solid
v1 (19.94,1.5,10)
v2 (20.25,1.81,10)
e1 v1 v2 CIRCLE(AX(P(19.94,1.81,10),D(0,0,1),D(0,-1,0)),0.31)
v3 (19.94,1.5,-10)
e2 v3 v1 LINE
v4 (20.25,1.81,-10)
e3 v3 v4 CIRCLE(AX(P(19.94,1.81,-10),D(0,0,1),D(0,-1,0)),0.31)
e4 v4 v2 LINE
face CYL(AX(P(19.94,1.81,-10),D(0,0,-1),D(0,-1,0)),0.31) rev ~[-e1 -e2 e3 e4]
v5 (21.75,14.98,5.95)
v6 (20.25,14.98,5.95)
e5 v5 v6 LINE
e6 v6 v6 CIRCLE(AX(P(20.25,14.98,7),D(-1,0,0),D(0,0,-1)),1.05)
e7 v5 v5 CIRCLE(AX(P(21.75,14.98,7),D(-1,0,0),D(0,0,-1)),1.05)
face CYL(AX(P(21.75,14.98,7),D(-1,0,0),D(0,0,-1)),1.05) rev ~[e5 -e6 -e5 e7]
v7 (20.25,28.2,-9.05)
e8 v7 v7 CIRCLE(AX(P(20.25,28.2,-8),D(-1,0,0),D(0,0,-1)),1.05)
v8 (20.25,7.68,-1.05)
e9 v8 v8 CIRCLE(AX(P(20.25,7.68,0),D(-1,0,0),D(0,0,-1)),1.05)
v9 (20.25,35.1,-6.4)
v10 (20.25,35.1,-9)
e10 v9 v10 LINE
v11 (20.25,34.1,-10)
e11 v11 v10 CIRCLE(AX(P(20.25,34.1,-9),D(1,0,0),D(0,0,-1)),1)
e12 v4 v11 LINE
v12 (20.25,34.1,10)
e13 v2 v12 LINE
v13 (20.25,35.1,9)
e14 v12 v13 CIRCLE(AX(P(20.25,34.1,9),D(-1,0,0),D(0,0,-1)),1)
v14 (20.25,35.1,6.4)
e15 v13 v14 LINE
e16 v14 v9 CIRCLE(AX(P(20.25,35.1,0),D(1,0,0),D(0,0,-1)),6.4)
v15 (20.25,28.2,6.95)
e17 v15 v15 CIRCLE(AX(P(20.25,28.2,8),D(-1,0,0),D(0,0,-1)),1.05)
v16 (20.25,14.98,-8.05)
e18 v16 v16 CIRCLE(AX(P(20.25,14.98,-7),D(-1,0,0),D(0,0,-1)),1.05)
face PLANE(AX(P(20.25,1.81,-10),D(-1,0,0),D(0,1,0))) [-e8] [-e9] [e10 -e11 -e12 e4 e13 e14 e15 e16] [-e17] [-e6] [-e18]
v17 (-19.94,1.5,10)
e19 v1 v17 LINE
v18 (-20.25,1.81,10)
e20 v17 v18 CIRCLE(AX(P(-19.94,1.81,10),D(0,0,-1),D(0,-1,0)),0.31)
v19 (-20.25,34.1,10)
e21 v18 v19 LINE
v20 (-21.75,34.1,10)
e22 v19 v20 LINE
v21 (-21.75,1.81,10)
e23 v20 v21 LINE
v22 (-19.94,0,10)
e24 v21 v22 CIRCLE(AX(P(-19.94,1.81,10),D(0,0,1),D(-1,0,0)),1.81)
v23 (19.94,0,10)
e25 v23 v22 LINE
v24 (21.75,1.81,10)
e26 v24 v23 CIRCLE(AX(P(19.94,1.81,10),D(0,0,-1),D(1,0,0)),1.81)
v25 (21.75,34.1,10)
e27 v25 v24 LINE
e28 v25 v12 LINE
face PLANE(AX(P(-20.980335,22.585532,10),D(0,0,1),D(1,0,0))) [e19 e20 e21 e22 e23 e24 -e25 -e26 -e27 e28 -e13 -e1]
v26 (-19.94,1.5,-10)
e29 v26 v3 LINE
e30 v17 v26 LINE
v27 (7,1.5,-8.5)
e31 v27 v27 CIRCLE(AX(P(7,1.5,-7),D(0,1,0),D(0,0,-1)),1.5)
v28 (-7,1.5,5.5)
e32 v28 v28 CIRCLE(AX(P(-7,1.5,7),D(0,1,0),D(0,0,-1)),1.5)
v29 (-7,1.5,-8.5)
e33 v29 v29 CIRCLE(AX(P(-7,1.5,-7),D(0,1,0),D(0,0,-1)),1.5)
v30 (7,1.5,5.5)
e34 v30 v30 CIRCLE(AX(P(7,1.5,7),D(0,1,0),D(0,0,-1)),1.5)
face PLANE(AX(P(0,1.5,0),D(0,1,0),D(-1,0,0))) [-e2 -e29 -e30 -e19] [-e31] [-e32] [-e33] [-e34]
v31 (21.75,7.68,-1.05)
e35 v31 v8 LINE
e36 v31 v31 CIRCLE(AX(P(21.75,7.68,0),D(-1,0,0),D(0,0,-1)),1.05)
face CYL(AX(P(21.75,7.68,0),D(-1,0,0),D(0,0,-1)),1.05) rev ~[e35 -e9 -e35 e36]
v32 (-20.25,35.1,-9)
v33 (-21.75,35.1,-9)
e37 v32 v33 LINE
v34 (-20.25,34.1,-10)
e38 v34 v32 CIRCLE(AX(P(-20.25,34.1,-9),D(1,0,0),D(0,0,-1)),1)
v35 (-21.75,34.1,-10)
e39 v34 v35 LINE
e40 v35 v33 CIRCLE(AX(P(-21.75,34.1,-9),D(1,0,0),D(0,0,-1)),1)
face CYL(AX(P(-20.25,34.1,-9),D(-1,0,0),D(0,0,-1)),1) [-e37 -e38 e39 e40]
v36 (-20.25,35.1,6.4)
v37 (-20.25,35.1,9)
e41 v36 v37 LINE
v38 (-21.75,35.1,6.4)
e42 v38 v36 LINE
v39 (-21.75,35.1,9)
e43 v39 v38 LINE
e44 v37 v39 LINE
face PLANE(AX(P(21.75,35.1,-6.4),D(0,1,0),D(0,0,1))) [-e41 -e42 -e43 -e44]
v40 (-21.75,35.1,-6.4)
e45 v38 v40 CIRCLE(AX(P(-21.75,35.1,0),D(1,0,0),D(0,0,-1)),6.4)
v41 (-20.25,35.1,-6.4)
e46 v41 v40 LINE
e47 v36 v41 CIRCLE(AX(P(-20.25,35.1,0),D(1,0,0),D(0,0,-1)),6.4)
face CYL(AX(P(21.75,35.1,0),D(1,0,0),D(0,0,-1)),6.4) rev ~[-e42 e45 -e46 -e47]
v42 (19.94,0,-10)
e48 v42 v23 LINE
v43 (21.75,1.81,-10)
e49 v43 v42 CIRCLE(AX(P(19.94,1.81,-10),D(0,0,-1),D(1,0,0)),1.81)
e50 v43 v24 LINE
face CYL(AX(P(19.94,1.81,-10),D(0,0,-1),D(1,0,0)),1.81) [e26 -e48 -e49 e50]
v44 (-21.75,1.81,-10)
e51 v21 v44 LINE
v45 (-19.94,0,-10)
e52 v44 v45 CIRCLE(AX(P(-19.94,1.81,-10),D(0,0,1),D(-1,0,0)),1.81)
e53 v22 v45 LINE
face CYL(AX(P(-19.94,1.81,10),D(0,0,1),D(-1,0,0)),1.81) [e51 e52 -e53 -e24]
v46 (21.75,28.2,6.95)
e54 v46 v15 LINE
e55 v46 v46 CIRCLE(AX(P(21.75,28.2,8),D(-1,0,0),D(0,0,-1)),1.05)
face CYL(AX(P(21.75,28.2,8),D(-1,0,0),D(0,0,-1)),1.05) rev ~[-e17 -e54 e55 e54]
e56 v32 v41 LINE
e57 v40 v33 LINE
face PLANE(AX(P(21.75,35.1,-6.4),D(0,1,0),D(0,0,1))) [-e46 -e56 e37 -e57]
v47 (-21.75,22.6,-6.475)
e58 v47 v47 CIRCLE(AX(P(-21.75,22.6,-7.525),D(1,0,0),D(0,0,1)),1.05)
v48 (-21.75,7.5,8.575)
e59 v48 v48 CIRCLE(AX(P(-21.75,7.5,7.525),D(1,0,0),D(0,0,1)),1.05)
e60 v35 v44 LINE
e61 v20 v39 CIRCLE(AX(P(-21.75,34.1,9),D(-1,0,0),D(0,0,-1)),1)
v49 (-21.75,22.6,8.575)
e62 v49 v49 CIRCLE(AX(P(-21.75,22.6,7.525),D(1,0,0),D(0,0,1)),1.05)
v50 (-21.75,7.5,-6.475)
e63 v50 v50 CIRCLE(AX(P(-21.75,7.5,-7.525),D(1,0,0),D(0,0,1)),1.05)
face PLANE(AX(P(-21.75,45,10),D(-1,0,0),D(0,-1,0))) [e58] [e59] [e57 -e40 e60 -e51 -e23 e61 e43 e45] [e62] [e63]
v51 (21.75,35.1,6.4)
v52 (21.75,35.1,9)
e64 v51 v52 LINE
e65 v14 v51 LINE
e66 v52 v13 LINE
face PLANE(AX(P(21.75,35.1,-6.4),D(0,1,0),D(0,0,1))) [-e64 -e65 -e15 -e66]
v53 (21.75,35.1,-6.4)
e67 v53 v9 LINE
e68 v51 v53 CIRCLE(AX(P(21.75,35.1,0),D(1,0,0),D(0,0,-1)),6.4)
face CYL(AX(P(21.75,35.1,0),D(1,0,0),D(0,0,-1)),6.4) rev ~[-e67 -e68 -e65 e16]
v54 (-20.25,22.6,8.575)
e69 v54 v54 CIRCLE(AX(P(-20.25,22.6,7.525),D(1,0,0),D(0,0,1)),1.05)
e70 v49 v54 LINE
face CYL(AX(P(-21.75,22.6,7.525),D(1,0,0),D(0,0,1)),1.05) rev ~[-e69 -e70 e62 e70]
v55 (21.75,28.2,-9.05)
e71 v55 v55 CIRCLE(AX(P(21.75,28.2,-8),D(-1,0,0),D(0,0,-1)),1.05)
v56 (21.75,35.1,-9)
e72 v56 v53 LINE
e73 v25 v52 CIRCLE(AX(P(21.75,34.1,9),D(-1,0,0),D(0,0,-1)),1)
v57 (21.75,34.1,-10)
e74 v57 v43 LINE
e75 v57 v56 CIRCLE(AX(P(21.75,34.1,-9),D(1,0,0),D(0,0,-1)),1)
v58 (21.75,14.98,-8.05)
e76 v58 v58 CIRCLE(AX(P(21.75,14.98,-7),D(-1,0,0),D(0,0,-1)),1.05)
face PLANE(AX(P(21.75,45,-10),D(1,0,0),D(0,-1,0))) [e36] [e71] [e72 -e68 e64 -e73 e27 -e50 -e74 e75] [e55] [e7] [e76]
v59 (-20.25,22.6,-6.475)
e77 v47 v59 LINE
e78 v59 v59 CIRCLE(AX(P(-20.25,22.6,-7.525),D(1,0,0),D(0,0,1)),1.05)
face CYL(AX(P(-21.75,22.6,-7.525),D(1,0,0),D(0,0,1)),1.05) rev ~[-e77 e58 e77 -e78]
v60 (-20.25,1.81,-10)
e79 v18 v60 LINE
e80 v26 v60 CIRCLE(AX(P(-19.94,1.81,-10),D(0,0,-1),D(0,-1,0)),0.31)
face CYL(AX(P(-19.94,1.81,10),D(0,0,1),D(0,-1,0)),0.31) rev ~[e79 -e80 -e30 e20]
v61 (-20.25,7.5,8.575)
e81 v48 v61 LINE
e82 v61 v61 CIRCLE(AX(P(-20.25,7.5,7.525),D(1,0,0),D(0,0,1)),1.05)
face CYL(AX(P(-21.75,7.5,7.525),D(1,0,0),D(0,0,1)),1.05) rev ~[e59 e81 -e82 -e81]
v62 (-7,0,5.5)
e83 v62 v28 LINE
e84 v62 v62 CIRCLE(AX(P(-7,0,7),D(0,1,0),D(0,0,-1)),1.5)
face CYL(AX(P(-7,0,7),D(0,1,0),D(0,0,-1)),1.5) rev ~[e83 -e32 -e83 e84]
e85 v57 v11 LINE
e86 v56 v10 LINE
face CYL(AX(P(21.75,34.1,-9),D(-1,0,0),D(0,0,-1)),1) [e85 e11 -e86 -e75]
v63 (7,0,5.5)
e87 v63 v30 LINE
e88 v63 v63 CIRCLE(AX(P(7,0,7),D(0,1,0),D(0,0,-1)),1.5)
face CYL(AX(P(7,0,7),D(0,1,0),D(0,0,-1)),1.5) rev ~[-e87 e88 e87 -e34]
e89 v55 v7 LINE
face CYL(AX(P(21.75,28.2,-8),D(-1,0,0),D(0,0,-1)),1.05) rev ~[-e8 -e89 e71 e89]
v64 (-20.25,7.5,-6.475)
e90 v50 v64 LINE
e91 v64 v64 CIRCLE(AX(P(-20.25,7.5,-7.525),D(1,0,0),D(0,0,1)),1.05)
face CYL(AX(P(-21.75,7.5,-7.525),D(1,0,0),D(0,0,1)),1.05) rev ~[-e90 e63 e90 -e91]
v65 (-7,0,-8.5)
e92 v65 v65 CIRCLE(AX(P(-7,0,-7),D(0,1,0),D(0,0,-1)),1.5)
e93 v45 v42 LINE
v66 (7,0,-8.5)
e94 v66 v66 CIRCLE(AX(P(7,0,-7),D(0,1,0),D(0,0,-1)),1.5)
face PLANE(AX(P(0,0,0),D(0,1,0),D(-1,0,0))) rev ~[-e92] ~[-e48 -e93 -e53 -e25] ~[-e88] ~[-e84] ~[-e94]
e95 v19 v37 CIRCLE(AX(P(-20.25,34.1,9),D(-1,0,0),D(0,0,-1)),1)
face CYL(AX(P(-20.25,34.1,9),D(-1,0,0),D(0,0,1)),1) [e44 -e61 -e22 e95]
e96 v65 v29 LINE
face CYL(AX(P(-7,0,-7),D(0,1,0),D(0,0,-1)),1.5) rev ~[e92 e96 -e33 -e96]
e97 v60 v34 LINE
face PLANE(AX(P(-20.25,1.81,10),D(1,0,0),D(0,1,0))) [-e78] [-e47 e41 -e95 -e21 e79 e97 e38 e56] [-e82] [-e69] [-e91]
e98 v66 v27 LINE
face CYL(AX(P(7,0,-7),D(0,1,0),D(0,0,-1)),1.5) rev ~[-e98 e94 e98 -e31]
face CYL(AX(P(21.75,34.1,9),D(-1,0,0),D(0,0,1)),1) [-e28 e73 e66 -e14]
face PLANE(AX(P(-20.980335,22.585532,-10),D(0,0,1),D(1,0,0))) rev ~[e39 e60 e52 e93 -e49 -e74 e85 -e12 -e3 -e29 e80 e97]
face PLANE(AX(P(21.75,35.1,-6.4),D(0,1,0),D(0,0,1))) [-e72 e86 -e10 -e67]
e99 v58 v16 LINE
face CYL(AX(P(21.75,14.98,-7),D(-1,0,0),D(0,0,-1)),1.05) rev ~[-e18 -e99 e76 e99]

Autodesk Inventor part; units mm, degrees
ref_plane "YZ Plane" through (0, 0, 0) normal (1, 0, 0) x (0, 1, 0)
ref_plane "XZ Plane" through (0, 0, 0) normal (0, 1, 0) x (-1, 0, 0)
ref_plane "XY Plane" through (0, 0, 0) normal (0, 0, 1) x (1, 0, 0)
sketch "Sketch1" plane through (0, 0, 0) normal (0, 1, 0) x (-1, 0, 0)
  line L0 (20.25, -10) -> (-20.25, -10)
  line L1 (-20.25, -10) -> (-20.25, 10)
  line L2 (-20.25, 10) -> (20.25, 10)
  line L3 (20.25, 10) -> (20.25, -10)
  point P0 (0, 0)
  dimension "d0" = 40.5
  dimension "d1" = 20
  dimension "d2" = 10
  dimension "d3" = 20.25
extrude "Plate1" add sketch "Sketch1" along normal blind 1.5
sketch "Sketch2" plane through (21.75, 0, -10) normal (-1, 0, 0) x (0, -1, 0)
  line L0 (0, 20) -> (0, 0)
  line L1 (0, 0) -> (-45, 0)
  line L2 (-45, 0) -> (-45, 20)
  line L3 (-45, 20) -> (0, 20)
edge flange "Flange1" height 45 angle 90 thickness 1.5 bend radius 0.31 thickness toward (-1, 0, 0) relief tear relief width 1.5 relief depth 0.75 edges at (20.25, 1.5, 0) wall of the first edge with corners at (21.75, 0, 10) (21.75, 0, -10) (21.75, 45, -10) (21.75, 45, 10)
bend "Bend1"
corner "Corner1"
sketch "Sketch3" plane through (-21.75, 0, 10) normal (1, 0, 0) x (0, 1, 0)
  line L0 (0, -20) -> (0, 0)
  line L1 (0, 0) -> (45, 0)
  line L2 (45, 0) -> (45, -20)
  line L3 (45, -20) -> (0, -20)
edge flange "Flange2" height 45 angle 90 thickness 1.5 bend radius 0.31 thickness toward (1, 0, 0) relief tear relief width 1.5 relief depth 0.75 edges at (-20.25, 1.5, 0) wall of the first edge with corners at (-21.75, 0, -10) (-21.75, 0, 10) (-21.75, 45, 10) (-21.75, 45, -10)
bend "Bend2"
corner "Corner2"
sketch "Sketch4" plane through (21.75, 45, 10) normal (1, 0, 0) x (0, 0, -1)
  circle A0 centre (10, -9.9) radius 6.4
  line L0 (0, 0) -> (20, 0) projected
  line L1 (20, 0) -> (20, -43.19) projected
  point P0 (10, -45)
  dimension "d25" = 9.9
  dimension "d26" = 12.8
  dimension "d27" = 10
extrude "Extrusion1" cut sketch "Sketch4" against normal blind 50
sketch "Sketch5" plane through (21.75, 45, 10) normal (1, 0, 0) x (0, 0, -1)
  circle A0 centre (10, -9.9) radius 6.4 projected
  line L0 (0, 0) -> (20, 0) projected
  line L1 (-4, 0) -> (24, 0)
  line L2 (24, 0) -> (24, -9.9)
  line L3 (24, -9.9) -> (-4, -9.9)
  line L4 (-4, -9.9) -> (-4, 0)
  line L5 (0, -43.19) -> (0, 0) projected
  point P0 (10, -45)
  dimension "d30" = 9.9
  dimension "d31" = 28
  dimension "d32" = 4
extrude "Extrusion2" cut sketch "Sketch5" against normal blind 50 contours L3 A0 | A0 L3 L5 L0 L1 L2 | L3 L4 L1 L5 picked at (9.2435, -7.9053)
fillet "Fillet1" radius 1 4 edges at (-21, 35.1, 10) (-21, 35.1, -10) (21, 35.1, -10) (21, 35.1, 10)
sketch "Sketch8" plane through (0, 0, 0) normal (0, -1, 0) x (1, 0, 0)
  circle A0 centre (8, -8) radius 1.05 projected
  circle A1 centre (-8, -8) radius 1.05 projected
  circle A2 centre (8, 8) radius 1.05 projected
  circle A3 centre (-8, 8) radius 1.05 projected
  circle A4 centre (7, 7) radius 1.5
  line L0 (7.53, 10.07) -> (-9.33, 10.07) projected
  line L1 (-10.07, 8.5) -> (-10.07, -29.6) projected
  circle A5 centre (-7, 7) radius 1.5
  circle A6 centre (7, -7) radius 1.5
  circle A7 centre (-7, -7) radius 1.5
  point P0 (0, 0)
  dimension "d71" = 7
  dimension "d72" = 7
  dimension "d73" = 3
  dimension "d76" = 14
  dimension "d79" = 14
hole "Hole3" at (-7, 0, 7) at (7, 0, -7) at (7, 0, 7) at (-7, 0, -7) direction (0, 1, 0) diameter 3 depth 1.5
sketch "Sketch9" plane through (-21.75, 1.81, -10) normal (-1, 0, 0) x (0, 0, 1)
  circle A0 centre (17.525, 20.79) radius 0.7835 projected
  circle A1 centre (17.525, 5.69) radius 0.7835 projected
  circle A2 centre (2.475, 20.79) radius 0.7835 projected
  circle A3 centre (2.475, 5.69) radius 0.7835 projected
  point P0 (10, -1.81)
hole "Hole4" at (-21.75, 7.5, 7.525) at (-21.75, 7.5, -7.525) at (-21.75, 22.6, -7.525) at (-21.75, 22.6, 7.525) direction (1, 0, 0) diameter 2.1 depth 1.5
sketch "Sketch10" plane through (21.75, 1.81, 10) normal (1, 0, 0) x (0, 0, -1)
  circle A0 centre (3, 13.17) radius 0.7835 projected
  circle A1 centre (10, 5.87) radius 0.7835 projected
  circle A2 centre (17, 13.17) radius 0.7835 projected
  circle A3 centre (2, 26.39) radius 0.7835 projected
  circle A4 centre (18, 26.39) radius 0.7835 projected
  point P0 (10, -1.81)
hole "Hole5" at (21.75, 28.2, 8) at (21.75, 28.2, -8) at (21.75, 14.98, -7) at (21.75, 7.68, 0) at (21.75, 14.98, 7) direction (-1, 0, 0) diameter 2.1 depth 1.5
equation "\"d55\" = Thickness"
equation "\"d62\" = Thickness"
equation "\"d69\" = Thickness"
equation "\"d4\" = Thickness"
equation "\"d5\" = BendReliefWidth"
equation "\"d6\" = BendReliefDepth"
equation "\"d7\" = MinimumRemnant"
equation "\"d8\" = TransitionRadius"
equation "\"d11\" = BendRadius"
equation "\"d12\" = CornerReliefSize"
equation "\"d13\" = GapSize"
equation "\"d14\" = JacobiRadiusSize"
equation "\"d15\" = BendReliefWidth"
equation "\"d16\" = BendReliefDepth"
equation "\"d17\" = MinimumRemnant"
equation "\"d18\" = TransitionRadius"
equation "\"d21\" = BendRadius"
equation "\"d22\" = CornerReliefSize"
equation "\"d23\" = GapSize"
equation "\"d24\" = JacobiRadiusSize"
equation "\"BendReliefWidth\" = Thickness"
equation "\"BendReliefDepth\" = 0.5 * Thickness"
equation "\"CornerReliefSize\" = 4 * Thickness"
equation "\"MinimumRemnant\" = 2 * Thickness"
equation "\"TransitionRadius\" = BendRadius"
equation "\"JacobiRadiusSize\" = BendRadius"
equation "\"GapSize\" = Thickness"
equation "\"Thickness\" = 1.5"
equation "\"BendRadius\" = 0.31"
properties part number "axis_10_top_frame" material "Aluminum 6061-AHC"
